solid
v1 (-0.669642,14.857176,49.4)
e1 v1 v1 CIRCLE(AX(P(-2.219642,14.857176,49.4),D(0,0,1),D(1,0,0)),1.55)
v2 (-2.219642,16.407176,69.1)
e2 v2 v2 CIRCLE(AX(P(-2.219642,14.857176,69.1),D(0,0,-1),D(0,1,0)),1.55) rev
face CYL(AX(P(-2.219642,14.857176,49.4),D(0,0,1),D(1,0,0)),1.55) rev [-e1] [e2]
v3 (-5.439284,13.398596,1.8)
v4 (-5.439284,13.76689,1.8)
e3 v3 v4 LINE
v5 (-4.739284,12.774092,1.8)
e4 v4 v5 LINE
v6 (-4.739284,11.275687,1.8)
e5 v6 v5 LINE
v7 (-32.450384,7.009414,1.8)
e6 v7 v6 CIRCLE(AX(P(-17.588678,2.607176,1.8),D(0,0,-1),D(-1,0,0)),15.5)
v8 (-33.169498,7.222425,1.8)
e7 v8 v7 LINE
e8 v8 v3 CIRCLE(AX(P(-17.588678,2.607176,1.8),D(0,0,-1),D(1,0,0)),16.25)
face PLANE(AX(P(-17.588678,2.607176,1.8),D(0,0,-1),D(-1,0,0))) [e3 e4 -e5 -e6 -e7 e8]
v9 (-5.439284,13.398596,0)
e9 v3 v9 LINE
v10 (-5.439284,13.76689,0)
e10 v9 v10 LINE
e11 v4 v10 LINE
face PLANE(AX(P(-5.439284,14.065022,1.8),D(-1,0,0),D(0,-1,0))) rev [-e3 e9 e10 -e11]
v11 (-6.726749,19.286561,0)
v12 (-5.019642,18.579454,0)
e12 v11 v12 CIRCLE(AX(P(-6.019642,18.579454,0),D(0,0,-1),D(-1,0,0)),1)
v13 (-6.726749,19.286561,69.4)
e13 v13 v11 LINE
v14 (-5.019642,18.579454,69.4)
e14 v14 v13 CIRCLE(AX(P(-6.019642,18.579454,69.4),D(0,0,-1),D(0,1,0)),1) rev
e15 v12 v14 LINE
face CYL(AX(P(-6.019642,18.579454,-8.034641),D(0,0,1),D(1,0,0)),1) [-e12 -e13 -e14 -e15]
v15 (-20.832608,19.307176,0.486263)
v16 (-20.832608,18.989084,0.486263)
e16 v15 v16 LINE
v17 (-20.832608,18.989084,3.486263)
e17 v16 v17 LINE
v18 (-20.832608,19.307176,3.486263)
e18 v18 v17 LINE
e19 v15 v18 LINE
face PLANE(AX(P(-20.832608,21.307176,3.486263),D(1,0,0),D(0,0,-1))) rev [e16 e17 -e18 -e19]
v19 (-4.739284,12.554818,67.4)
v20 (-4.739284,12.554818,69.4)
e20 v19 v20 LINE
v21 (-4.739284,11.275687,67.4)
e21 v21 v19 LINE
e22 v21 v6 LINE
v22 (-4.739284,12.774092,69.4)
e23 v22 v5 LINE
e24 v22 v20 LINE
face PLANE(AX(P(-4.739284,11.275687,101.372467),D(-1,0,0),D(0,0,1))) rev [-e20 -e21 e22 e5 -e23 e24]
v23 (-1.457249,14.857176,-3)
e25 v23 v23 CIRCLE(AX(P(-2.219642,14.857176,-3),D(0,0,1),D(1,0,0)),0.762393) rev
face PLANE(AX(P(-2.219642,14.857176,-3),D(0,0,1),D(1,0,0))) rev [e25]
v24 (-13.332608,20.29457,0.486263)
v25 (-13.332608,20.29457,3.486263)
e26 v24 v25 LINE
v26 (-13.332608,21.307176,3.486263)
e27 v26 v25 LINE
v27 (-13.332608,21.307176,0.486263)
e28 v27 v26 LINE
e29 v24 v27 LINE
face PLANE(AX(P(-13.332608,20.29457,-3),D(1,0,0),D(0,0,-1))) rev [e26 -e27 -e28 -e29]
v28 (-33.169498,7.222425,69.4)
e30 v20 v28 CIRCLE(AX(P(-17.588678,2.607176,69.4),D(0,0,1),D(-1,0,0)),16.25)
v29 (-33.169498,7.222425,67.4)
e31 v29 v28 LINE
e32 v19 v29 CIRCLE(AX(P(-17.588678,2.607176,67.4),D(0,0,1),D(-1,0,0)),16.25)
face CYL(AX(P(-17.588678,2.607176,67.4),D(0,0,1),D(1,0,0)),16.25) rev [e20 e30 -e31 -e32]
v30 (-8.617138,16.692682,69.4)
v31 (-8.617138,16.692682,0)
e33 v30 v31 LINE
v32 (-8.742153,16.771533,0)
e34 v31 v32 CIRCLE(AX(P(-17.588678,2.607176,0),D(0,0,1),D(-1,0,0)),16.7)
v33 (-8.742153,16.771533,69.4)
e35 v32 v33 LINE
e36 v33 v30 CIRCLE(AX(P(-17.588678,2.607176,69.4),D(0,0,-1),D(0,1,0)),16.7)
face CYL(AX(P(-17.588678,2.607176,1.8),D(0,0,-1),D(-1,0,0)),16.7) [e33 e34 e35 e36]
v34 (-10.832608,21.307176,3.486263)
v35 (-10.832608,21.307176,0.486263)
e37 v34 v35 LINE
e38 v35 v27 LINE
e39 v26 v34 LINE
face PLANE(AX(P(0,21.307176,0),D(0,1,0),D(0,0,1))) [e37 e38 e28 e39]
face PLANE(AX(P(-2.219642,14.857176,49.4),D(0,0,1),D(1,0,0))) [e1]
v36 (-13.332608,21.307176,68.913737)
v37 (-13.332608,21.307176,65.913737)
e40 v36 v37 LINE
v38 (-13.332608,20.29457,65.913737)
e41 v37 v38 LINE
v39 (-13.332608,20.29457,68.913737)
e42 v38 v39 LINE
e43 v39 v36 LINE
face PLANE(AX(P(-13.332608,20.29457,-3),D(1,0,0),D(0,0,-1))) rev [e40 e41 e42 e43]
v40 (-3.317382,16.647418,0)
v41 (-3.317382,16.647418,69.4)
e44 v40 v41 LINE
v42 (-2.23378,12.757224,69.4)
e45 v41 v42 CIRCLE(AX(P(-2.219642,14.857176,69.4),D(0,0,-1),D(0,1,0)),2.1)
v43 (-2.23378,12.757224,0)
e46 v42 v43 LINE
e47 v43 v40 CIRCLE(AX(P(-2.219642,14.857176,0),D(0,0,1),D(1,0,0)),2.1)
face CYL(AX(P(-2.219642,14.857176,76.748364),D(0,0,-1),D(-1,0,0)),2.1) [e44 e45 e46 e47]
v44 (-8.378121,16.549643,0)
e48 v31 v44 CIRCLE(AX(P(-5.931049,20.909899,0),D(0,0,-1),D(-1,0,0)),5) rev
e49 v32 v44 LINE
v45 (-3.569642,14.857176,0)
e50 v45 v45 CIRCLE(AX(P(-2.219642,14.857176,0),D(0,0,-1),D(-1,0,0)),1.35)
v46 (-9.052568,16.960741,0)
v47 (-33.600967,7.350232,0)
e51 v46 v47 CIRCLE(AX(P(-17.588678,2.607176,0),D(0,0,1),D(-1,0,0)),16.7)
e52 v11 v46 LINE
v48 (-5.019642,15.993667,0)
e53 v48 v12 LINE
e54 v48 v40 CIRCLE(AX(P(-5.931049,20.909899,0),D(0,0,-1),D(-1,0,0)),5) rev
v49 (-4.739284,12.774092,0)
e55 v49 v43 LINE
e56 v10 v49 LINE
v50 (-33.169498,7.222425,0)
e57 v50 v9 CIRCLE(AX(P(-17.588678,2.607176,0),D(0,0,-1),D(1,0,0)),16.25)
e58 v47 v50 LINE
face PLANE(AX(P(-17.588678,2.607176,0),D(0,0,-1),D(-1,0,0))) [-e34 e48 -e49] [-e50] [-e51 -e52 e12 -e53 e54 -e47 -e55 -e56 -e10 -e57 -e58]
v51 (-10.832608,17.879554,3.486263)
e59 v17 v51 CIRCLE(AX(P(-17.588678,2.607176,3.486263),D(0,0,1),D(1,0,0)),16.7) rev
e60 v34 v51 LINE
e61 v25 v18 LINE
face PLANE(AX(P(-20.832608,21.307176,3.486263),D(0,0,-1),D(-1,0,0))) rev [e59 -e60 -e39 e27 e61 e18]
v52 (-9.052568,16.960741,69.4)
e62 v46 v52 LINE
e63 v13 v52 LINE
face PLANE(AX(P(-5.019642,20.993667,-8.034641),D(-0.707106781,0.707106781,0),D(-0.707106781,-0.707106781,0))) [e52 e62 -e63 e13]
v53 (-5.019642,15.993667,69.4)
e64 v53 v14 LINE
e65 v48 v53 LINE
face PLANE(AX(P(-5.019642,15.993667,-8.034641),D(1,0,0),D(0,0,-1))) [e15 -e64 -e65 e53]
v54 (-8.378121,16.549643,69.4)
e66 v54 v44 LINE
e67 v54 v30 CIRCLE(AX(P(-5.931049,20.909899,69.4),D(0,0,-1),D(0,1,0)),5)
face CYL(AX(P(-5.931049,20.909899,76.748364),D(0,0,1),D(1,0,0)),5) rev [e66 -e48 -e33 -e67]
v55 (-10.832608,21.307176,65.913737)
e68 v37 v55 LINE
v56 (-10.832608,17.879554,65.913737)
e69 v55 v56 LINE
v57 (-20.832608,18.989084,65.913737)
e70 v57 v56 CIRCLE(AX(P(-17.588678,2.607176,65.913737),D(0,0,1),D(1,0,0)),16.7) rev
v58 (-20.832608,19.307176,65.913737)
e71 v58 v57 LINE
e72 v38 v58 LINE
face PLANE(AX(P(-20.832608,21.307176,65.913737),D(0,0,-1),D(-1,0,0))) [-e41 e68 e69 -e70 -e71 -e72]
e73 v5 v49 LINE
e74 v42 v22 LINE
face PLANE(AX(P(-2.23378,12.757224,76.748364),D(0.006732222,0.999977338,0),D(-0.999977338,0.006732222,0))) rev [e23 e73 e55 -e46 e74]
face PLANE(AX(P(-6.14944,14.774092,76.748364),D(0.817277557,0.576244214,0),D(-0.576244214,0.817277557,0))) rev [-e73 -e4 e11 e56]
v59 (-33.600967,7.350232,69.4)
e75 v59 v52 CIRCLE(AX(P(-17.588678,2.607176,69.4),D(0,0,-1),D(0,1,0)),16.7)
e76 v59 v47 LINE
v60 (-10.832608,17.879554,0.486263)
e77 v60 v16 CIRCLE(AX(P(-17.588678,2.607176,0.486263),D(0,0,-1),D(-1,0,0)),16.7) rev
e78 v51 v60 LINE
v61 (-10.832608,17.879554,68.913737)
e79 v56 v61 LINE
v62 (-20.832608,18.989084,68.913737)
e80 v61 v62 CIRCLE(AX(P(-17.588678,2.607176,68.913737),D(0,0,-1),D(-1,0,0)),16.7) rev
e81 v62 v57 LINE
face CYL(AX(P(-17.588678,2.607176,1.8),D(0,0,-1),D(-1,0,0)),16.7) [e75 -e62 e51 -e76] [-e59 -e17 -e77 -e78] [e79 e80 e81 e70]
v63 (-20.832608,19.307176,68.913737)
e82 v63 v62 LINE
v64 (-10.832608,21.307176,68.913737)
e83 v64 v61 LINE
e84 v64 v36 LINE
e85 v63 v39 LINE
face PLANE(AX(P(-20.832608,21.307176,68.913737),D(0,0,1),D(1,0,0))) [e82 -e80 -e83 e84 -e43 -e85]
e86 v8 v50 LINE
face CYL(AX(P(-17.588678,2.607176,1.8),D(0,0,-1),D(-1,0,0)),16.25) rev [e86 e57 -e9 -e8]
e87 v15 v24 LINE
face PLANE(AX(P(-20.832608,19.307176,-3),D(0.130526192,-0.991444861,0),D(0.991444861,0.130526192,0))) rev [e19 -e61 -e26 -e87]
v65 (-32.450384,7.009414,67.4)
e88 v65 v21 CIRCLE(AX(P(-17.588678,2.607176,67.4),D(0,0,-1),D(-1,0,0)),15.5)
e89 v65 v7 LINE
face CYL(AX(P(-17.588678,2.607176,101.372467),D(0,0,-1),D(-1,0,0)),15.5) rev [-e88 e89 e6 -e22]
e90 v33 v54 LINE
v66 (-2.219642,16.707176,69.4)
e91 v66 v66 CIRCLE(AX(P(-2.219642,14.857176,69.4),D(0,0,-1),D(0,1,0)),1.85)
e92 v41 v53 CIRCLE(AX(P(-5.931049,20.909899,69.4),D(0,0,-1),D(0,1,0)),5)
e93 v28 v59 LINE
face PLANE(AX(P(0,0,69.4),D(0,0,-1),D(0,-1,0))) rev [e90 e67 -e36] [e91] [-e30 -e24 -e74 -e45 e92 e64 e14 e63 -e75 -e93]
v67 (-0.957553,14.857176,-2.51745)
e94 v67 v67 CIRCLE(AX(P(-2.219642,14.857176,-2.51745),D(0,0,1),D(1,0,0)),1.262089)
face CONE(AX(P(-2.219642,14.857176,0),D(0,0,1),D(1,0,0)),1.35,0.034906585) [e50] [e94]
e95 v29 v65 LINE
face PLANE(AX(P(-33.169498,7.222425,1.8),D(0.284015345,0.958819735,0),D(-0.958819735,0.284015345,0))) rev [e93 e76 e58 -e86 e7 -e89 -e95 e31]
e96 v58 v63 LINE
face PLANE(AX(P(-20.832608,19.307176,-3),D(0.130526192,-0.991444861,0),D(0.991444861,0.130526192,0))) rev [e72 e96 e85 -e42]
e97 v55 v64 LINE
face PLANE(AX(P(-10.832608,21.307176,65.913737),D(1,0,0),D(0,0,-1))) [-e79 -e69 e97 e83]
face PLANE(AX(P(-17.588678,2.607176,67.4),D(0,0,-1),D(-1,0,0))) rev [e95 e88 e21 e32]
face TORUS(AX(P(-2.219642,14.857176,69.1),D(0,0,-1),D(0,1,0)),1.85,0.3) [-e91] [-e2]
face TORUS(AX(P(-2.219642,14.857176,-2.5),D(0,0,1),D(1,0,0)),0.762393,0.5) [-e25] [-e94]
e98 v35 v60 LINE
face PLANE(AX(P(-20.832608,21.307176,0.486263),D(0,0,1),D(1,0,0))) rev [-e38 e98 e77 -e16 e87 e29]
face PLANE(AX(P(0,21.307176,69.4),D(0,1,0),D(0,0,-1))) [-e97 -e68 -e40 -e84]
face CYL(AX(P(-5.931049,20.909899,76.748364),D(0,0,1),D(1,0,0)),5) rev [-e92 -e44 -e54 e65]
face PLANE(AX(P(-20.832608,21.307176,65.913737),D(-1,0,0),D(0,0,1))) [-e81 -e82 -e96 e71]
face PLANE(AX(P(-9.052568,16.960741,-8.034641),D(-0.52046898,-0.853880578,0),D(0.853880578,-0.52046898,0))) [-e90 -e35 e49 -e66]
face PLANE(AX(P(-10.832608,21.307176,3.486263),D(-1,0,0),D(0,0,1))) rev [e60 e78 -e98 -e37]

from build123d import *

# Parameters (mm, degrees)
BOSS_EXTRU_1_DEPTH      = 1.8
BOSS_EXTRU_2_DEPTH      = 67.6
ESQUISSE3_R             = 1.35
BOSS_EXTRU_3_DEPTH      = 3
BOSS_EXTRU_3_DRAFT      = -2
BOSS_EXTRU_4_DEPTH      = 69.4
CONG_1_R                = 5
ESQUISSE5_R             = 1.55
ENL_V_MAT_EXTRU_1_DEPTH = 20
BOSS_EXTRU_5_START      = 0.486262707
BOSS_EXTRU_5_DEPTH      = 3
ENL_V_START             = -2
ENL_V_MAT_EXTRU_2_DEPTH = 2
ENL_V_MAT_EXTRU_3_DEPTH = 83.186412318
BOSS_EXTRU_6_DEPTH      = 69.4
CONG_2_R                = 1
CONG_3_R                = 0.3
CONG_4_R                = 0.5


# Read off the part's stored shape, not the designer's step: Boss.-Extru.5
with BuildPart() as part:
    # Esquisse1 → Boss.-Extru.1 (new body)
    with BuildSketch(Plane.XY):
        with BuildLine():
            Line((-33.169498422, 7.22242532), (-33.600967303, 7.350232225))
            ThreePointArc((-33.600967303, 7.350232225), (-21.461995756, 18.851787613), (-5.439284285, 14.065022141))
            Line((-5.439284285, 14.065022141), (-5.439284285, 13.398595658))
            ThreePointArc((-5.439284285, 13.398595658), (-21.121374045, 18.468530159), (-33.169498422, 7.22242532))
        make_face()
    extrude(amount=BOSS_EXTRU_1_DEPTH)

    # Esquisse2 → Boss.-Extru.2 (add)
    with BuildSketch(Plane.XY.offset(1.8)):
        with BuildLine():
            Line((-33.600967303, 7.350232225), (-32.450383621, 7.009413812))
            ThreePointArc((-32.450383621, 7.009413812), (-19.947199013, 17.926685666), (-4.739284285, 11.275687265))
            Line((-4.739284285, 11.275687265), (-4.739284285, 13.274091553))
            ThreePointArc((-4.739284285, 13.274091553), (-5.083029835, 13.675092245), (-5.439284285, 14.065022141))
            ThreePointArc((-5.439284285, 14.065022141), (-21.461995756, 18.851787613), (-33.600967303, 7.350232225))
        make_face()
    extrude(amount=BOSS_EXTRU_2_DEPTH)



with BuildPart() as body_2:
    # Esquisse3 → Boss.-Extru.3 (with draft: the straight prism first)
    with BuildSketch(Plane.XY):
        with Locations((-2.219642143, 14.857175969)):
            Circle(ESQUISSE3_R)
    extrude(amount=-BOSS_EXTRU_3_DEPTH)
    # Boss.-Extru.3: the draft: its side faces are tilted about the plane it starts from
    boss_extru_3_sides = [body_2.faces().sort_by_distance(p)[0] for p in [
        (-3.569642143, 14.857175969, -1.5),
    ]]
    draft(boss_extru_3_sides, Plane.XY, BOSS_EXTRU_3_DRAFT)


with BuildPart() as part_1:
    add(part.part)

    add(body_2.part)  # Boss.-Extru.4 merges body 2
    # Esquisse4 → Boss.-Extru.4 (add)
    with BuildSketch(Plane.XY):
        with BuildLine():
            Line((-2.233779809, 12.757223558), (-4.739284285, 12.774091553))
            Line((-4.739284285, 12.774091553), (-6.149439768, 14.774091553))
            Line((-6.149439768, 14.774091553), (-3.378858565, 16.608237729))
            ThreePointArc((-3.378858565, 16.608237729), (-0.206741875, 15.455701249), (-2.233779809, 12.757223558))
        make_face()
    extrude(amount=BOSS_EXTRU_4_DEPTH)

    # Congé1
    cong_1_edges = [part_1.edges().sort_by_distance(p)[0] for p in [
        (-6.149439768, 14.774091553, 34.7),
    ]]
    fillet(cong_1_edges, radius=CONG_1_R)

    # Esquisse5 → Enlèv. mat.-Extru.1 (cut)
    with BuildSketch(Plane.XY.offset(69.4)):
        with Locations((-2.219642143, 14.857175969)):
            Circle(ESQUISSE5_R)
    extrude(amount=-ENL_V_MAT_EXTRU_1_DEPTH, mode=Mode.SUBTRACT)

    # Boss.-Extru.5 outline → Boss.-Extru.5 (add)
    with BuildSketch(Plane.XY.offset(BOSS_EXTRU_5_START)):
        with BuildLine():
            Line((-10.832608102, 17.879553752), (-10.832608102, 21.307175969))
            Line((-10.832608102, 21.307175969), (-20.832608102, 21.307175969))
            Line((-20.832608102, 21.307175969), (-20.832608102, 18.989084153))
            ThreePointArc((-20.832608102, 18.989084153), (-15.747062959, 19.205322101), (-10.832608102, 17.879553752))
        make_face()
    boss_extru_5 = extrude(amount=BOSS_EXTRU_5_DEPTH)

    # Symétrie1: Boss.-Extru.5 across plane
    add(boss_extru_5.mirror(Plane.XY.offset(34.7)))

    # Esquisse7 → Enlèv. mat.-Extru.2 (cut)
    with BuildSketch(Plane.XY.offset(69.4).offset(ENL_V_START)):
        with BuildLine():
            Line((-32.450383621, 7.009413812), (-33.169498422, 7.22242532))
            ThreePointArc((-33.169498422, 7.22242532), (-20.584304116, 18.578673161), (-4.739284285, 12.554818307))
            Line((-4.739284285, 12.554818307), (-4.739284285, 11.275687265))
            ThreePointArc((-4.739284285, 11.275687265), (-19.947199013, 17.926685666), (-32.450383621, 7.009413812))
        make_face()
    extrude(amount=ENL_V_MAT_EXTRU_2_DEPTH, mode=Mode.SUBTRACT)

    # Esquisse9 → Enlèv. mat.-Extru.3 (cut, through all)
    with BuildSketch(Plane.XY.offset(68.913737293)):
        Polygon((-20.832608102, 19.307175969), (-13.332608102, 20.294569701), (-13.332608102, 21.307175969), (-20.832608102, 21.307175969), align=None)
    extrude(amount=-ENL_V_MAT_EXTRU_3_DEPTH, mode=Mode.SUBTRACT)

    # Esquisse10 → Boss.-Extru.6 (add)
    with BuildSketch(Plane.XY.offset(69.4)):
        Polygon((-5.019642143, 15.993667324), (-5.019642143, 20.993667324), (-9.052568259, 16.960741208), (-4.646335714, 14.274994024), align=None)
    extrude(amount=-BOSS_EXTRU_6_DEPTH)

    # Congé2
    cong_2_edges = [part_1.edges().sort_by_distance(p)[0] for p in [
        (-5.019642143, 20.993667324, 34.7),
    ]]
    fillet(cong_2_edges, radius=CONG_2_R)

    # Congé3
    cong_3_edges = [part_1.edges().sort_by_distance(p)[0] for p in [
        (-3.769642143, 14.857175969, 69.4),
    ]]
    fillet(cong_3_edges, radius=CONG_3_R)

    # Congé4
    cong_4_edges = [part_1.edges().sort_by_distance(p)[0] for p in [
        (-3.464879834, 14.857175969, -3),
    ]]
    fillet(cong_4_edges, radius=CONG_4_R)


solid = part_1.part
